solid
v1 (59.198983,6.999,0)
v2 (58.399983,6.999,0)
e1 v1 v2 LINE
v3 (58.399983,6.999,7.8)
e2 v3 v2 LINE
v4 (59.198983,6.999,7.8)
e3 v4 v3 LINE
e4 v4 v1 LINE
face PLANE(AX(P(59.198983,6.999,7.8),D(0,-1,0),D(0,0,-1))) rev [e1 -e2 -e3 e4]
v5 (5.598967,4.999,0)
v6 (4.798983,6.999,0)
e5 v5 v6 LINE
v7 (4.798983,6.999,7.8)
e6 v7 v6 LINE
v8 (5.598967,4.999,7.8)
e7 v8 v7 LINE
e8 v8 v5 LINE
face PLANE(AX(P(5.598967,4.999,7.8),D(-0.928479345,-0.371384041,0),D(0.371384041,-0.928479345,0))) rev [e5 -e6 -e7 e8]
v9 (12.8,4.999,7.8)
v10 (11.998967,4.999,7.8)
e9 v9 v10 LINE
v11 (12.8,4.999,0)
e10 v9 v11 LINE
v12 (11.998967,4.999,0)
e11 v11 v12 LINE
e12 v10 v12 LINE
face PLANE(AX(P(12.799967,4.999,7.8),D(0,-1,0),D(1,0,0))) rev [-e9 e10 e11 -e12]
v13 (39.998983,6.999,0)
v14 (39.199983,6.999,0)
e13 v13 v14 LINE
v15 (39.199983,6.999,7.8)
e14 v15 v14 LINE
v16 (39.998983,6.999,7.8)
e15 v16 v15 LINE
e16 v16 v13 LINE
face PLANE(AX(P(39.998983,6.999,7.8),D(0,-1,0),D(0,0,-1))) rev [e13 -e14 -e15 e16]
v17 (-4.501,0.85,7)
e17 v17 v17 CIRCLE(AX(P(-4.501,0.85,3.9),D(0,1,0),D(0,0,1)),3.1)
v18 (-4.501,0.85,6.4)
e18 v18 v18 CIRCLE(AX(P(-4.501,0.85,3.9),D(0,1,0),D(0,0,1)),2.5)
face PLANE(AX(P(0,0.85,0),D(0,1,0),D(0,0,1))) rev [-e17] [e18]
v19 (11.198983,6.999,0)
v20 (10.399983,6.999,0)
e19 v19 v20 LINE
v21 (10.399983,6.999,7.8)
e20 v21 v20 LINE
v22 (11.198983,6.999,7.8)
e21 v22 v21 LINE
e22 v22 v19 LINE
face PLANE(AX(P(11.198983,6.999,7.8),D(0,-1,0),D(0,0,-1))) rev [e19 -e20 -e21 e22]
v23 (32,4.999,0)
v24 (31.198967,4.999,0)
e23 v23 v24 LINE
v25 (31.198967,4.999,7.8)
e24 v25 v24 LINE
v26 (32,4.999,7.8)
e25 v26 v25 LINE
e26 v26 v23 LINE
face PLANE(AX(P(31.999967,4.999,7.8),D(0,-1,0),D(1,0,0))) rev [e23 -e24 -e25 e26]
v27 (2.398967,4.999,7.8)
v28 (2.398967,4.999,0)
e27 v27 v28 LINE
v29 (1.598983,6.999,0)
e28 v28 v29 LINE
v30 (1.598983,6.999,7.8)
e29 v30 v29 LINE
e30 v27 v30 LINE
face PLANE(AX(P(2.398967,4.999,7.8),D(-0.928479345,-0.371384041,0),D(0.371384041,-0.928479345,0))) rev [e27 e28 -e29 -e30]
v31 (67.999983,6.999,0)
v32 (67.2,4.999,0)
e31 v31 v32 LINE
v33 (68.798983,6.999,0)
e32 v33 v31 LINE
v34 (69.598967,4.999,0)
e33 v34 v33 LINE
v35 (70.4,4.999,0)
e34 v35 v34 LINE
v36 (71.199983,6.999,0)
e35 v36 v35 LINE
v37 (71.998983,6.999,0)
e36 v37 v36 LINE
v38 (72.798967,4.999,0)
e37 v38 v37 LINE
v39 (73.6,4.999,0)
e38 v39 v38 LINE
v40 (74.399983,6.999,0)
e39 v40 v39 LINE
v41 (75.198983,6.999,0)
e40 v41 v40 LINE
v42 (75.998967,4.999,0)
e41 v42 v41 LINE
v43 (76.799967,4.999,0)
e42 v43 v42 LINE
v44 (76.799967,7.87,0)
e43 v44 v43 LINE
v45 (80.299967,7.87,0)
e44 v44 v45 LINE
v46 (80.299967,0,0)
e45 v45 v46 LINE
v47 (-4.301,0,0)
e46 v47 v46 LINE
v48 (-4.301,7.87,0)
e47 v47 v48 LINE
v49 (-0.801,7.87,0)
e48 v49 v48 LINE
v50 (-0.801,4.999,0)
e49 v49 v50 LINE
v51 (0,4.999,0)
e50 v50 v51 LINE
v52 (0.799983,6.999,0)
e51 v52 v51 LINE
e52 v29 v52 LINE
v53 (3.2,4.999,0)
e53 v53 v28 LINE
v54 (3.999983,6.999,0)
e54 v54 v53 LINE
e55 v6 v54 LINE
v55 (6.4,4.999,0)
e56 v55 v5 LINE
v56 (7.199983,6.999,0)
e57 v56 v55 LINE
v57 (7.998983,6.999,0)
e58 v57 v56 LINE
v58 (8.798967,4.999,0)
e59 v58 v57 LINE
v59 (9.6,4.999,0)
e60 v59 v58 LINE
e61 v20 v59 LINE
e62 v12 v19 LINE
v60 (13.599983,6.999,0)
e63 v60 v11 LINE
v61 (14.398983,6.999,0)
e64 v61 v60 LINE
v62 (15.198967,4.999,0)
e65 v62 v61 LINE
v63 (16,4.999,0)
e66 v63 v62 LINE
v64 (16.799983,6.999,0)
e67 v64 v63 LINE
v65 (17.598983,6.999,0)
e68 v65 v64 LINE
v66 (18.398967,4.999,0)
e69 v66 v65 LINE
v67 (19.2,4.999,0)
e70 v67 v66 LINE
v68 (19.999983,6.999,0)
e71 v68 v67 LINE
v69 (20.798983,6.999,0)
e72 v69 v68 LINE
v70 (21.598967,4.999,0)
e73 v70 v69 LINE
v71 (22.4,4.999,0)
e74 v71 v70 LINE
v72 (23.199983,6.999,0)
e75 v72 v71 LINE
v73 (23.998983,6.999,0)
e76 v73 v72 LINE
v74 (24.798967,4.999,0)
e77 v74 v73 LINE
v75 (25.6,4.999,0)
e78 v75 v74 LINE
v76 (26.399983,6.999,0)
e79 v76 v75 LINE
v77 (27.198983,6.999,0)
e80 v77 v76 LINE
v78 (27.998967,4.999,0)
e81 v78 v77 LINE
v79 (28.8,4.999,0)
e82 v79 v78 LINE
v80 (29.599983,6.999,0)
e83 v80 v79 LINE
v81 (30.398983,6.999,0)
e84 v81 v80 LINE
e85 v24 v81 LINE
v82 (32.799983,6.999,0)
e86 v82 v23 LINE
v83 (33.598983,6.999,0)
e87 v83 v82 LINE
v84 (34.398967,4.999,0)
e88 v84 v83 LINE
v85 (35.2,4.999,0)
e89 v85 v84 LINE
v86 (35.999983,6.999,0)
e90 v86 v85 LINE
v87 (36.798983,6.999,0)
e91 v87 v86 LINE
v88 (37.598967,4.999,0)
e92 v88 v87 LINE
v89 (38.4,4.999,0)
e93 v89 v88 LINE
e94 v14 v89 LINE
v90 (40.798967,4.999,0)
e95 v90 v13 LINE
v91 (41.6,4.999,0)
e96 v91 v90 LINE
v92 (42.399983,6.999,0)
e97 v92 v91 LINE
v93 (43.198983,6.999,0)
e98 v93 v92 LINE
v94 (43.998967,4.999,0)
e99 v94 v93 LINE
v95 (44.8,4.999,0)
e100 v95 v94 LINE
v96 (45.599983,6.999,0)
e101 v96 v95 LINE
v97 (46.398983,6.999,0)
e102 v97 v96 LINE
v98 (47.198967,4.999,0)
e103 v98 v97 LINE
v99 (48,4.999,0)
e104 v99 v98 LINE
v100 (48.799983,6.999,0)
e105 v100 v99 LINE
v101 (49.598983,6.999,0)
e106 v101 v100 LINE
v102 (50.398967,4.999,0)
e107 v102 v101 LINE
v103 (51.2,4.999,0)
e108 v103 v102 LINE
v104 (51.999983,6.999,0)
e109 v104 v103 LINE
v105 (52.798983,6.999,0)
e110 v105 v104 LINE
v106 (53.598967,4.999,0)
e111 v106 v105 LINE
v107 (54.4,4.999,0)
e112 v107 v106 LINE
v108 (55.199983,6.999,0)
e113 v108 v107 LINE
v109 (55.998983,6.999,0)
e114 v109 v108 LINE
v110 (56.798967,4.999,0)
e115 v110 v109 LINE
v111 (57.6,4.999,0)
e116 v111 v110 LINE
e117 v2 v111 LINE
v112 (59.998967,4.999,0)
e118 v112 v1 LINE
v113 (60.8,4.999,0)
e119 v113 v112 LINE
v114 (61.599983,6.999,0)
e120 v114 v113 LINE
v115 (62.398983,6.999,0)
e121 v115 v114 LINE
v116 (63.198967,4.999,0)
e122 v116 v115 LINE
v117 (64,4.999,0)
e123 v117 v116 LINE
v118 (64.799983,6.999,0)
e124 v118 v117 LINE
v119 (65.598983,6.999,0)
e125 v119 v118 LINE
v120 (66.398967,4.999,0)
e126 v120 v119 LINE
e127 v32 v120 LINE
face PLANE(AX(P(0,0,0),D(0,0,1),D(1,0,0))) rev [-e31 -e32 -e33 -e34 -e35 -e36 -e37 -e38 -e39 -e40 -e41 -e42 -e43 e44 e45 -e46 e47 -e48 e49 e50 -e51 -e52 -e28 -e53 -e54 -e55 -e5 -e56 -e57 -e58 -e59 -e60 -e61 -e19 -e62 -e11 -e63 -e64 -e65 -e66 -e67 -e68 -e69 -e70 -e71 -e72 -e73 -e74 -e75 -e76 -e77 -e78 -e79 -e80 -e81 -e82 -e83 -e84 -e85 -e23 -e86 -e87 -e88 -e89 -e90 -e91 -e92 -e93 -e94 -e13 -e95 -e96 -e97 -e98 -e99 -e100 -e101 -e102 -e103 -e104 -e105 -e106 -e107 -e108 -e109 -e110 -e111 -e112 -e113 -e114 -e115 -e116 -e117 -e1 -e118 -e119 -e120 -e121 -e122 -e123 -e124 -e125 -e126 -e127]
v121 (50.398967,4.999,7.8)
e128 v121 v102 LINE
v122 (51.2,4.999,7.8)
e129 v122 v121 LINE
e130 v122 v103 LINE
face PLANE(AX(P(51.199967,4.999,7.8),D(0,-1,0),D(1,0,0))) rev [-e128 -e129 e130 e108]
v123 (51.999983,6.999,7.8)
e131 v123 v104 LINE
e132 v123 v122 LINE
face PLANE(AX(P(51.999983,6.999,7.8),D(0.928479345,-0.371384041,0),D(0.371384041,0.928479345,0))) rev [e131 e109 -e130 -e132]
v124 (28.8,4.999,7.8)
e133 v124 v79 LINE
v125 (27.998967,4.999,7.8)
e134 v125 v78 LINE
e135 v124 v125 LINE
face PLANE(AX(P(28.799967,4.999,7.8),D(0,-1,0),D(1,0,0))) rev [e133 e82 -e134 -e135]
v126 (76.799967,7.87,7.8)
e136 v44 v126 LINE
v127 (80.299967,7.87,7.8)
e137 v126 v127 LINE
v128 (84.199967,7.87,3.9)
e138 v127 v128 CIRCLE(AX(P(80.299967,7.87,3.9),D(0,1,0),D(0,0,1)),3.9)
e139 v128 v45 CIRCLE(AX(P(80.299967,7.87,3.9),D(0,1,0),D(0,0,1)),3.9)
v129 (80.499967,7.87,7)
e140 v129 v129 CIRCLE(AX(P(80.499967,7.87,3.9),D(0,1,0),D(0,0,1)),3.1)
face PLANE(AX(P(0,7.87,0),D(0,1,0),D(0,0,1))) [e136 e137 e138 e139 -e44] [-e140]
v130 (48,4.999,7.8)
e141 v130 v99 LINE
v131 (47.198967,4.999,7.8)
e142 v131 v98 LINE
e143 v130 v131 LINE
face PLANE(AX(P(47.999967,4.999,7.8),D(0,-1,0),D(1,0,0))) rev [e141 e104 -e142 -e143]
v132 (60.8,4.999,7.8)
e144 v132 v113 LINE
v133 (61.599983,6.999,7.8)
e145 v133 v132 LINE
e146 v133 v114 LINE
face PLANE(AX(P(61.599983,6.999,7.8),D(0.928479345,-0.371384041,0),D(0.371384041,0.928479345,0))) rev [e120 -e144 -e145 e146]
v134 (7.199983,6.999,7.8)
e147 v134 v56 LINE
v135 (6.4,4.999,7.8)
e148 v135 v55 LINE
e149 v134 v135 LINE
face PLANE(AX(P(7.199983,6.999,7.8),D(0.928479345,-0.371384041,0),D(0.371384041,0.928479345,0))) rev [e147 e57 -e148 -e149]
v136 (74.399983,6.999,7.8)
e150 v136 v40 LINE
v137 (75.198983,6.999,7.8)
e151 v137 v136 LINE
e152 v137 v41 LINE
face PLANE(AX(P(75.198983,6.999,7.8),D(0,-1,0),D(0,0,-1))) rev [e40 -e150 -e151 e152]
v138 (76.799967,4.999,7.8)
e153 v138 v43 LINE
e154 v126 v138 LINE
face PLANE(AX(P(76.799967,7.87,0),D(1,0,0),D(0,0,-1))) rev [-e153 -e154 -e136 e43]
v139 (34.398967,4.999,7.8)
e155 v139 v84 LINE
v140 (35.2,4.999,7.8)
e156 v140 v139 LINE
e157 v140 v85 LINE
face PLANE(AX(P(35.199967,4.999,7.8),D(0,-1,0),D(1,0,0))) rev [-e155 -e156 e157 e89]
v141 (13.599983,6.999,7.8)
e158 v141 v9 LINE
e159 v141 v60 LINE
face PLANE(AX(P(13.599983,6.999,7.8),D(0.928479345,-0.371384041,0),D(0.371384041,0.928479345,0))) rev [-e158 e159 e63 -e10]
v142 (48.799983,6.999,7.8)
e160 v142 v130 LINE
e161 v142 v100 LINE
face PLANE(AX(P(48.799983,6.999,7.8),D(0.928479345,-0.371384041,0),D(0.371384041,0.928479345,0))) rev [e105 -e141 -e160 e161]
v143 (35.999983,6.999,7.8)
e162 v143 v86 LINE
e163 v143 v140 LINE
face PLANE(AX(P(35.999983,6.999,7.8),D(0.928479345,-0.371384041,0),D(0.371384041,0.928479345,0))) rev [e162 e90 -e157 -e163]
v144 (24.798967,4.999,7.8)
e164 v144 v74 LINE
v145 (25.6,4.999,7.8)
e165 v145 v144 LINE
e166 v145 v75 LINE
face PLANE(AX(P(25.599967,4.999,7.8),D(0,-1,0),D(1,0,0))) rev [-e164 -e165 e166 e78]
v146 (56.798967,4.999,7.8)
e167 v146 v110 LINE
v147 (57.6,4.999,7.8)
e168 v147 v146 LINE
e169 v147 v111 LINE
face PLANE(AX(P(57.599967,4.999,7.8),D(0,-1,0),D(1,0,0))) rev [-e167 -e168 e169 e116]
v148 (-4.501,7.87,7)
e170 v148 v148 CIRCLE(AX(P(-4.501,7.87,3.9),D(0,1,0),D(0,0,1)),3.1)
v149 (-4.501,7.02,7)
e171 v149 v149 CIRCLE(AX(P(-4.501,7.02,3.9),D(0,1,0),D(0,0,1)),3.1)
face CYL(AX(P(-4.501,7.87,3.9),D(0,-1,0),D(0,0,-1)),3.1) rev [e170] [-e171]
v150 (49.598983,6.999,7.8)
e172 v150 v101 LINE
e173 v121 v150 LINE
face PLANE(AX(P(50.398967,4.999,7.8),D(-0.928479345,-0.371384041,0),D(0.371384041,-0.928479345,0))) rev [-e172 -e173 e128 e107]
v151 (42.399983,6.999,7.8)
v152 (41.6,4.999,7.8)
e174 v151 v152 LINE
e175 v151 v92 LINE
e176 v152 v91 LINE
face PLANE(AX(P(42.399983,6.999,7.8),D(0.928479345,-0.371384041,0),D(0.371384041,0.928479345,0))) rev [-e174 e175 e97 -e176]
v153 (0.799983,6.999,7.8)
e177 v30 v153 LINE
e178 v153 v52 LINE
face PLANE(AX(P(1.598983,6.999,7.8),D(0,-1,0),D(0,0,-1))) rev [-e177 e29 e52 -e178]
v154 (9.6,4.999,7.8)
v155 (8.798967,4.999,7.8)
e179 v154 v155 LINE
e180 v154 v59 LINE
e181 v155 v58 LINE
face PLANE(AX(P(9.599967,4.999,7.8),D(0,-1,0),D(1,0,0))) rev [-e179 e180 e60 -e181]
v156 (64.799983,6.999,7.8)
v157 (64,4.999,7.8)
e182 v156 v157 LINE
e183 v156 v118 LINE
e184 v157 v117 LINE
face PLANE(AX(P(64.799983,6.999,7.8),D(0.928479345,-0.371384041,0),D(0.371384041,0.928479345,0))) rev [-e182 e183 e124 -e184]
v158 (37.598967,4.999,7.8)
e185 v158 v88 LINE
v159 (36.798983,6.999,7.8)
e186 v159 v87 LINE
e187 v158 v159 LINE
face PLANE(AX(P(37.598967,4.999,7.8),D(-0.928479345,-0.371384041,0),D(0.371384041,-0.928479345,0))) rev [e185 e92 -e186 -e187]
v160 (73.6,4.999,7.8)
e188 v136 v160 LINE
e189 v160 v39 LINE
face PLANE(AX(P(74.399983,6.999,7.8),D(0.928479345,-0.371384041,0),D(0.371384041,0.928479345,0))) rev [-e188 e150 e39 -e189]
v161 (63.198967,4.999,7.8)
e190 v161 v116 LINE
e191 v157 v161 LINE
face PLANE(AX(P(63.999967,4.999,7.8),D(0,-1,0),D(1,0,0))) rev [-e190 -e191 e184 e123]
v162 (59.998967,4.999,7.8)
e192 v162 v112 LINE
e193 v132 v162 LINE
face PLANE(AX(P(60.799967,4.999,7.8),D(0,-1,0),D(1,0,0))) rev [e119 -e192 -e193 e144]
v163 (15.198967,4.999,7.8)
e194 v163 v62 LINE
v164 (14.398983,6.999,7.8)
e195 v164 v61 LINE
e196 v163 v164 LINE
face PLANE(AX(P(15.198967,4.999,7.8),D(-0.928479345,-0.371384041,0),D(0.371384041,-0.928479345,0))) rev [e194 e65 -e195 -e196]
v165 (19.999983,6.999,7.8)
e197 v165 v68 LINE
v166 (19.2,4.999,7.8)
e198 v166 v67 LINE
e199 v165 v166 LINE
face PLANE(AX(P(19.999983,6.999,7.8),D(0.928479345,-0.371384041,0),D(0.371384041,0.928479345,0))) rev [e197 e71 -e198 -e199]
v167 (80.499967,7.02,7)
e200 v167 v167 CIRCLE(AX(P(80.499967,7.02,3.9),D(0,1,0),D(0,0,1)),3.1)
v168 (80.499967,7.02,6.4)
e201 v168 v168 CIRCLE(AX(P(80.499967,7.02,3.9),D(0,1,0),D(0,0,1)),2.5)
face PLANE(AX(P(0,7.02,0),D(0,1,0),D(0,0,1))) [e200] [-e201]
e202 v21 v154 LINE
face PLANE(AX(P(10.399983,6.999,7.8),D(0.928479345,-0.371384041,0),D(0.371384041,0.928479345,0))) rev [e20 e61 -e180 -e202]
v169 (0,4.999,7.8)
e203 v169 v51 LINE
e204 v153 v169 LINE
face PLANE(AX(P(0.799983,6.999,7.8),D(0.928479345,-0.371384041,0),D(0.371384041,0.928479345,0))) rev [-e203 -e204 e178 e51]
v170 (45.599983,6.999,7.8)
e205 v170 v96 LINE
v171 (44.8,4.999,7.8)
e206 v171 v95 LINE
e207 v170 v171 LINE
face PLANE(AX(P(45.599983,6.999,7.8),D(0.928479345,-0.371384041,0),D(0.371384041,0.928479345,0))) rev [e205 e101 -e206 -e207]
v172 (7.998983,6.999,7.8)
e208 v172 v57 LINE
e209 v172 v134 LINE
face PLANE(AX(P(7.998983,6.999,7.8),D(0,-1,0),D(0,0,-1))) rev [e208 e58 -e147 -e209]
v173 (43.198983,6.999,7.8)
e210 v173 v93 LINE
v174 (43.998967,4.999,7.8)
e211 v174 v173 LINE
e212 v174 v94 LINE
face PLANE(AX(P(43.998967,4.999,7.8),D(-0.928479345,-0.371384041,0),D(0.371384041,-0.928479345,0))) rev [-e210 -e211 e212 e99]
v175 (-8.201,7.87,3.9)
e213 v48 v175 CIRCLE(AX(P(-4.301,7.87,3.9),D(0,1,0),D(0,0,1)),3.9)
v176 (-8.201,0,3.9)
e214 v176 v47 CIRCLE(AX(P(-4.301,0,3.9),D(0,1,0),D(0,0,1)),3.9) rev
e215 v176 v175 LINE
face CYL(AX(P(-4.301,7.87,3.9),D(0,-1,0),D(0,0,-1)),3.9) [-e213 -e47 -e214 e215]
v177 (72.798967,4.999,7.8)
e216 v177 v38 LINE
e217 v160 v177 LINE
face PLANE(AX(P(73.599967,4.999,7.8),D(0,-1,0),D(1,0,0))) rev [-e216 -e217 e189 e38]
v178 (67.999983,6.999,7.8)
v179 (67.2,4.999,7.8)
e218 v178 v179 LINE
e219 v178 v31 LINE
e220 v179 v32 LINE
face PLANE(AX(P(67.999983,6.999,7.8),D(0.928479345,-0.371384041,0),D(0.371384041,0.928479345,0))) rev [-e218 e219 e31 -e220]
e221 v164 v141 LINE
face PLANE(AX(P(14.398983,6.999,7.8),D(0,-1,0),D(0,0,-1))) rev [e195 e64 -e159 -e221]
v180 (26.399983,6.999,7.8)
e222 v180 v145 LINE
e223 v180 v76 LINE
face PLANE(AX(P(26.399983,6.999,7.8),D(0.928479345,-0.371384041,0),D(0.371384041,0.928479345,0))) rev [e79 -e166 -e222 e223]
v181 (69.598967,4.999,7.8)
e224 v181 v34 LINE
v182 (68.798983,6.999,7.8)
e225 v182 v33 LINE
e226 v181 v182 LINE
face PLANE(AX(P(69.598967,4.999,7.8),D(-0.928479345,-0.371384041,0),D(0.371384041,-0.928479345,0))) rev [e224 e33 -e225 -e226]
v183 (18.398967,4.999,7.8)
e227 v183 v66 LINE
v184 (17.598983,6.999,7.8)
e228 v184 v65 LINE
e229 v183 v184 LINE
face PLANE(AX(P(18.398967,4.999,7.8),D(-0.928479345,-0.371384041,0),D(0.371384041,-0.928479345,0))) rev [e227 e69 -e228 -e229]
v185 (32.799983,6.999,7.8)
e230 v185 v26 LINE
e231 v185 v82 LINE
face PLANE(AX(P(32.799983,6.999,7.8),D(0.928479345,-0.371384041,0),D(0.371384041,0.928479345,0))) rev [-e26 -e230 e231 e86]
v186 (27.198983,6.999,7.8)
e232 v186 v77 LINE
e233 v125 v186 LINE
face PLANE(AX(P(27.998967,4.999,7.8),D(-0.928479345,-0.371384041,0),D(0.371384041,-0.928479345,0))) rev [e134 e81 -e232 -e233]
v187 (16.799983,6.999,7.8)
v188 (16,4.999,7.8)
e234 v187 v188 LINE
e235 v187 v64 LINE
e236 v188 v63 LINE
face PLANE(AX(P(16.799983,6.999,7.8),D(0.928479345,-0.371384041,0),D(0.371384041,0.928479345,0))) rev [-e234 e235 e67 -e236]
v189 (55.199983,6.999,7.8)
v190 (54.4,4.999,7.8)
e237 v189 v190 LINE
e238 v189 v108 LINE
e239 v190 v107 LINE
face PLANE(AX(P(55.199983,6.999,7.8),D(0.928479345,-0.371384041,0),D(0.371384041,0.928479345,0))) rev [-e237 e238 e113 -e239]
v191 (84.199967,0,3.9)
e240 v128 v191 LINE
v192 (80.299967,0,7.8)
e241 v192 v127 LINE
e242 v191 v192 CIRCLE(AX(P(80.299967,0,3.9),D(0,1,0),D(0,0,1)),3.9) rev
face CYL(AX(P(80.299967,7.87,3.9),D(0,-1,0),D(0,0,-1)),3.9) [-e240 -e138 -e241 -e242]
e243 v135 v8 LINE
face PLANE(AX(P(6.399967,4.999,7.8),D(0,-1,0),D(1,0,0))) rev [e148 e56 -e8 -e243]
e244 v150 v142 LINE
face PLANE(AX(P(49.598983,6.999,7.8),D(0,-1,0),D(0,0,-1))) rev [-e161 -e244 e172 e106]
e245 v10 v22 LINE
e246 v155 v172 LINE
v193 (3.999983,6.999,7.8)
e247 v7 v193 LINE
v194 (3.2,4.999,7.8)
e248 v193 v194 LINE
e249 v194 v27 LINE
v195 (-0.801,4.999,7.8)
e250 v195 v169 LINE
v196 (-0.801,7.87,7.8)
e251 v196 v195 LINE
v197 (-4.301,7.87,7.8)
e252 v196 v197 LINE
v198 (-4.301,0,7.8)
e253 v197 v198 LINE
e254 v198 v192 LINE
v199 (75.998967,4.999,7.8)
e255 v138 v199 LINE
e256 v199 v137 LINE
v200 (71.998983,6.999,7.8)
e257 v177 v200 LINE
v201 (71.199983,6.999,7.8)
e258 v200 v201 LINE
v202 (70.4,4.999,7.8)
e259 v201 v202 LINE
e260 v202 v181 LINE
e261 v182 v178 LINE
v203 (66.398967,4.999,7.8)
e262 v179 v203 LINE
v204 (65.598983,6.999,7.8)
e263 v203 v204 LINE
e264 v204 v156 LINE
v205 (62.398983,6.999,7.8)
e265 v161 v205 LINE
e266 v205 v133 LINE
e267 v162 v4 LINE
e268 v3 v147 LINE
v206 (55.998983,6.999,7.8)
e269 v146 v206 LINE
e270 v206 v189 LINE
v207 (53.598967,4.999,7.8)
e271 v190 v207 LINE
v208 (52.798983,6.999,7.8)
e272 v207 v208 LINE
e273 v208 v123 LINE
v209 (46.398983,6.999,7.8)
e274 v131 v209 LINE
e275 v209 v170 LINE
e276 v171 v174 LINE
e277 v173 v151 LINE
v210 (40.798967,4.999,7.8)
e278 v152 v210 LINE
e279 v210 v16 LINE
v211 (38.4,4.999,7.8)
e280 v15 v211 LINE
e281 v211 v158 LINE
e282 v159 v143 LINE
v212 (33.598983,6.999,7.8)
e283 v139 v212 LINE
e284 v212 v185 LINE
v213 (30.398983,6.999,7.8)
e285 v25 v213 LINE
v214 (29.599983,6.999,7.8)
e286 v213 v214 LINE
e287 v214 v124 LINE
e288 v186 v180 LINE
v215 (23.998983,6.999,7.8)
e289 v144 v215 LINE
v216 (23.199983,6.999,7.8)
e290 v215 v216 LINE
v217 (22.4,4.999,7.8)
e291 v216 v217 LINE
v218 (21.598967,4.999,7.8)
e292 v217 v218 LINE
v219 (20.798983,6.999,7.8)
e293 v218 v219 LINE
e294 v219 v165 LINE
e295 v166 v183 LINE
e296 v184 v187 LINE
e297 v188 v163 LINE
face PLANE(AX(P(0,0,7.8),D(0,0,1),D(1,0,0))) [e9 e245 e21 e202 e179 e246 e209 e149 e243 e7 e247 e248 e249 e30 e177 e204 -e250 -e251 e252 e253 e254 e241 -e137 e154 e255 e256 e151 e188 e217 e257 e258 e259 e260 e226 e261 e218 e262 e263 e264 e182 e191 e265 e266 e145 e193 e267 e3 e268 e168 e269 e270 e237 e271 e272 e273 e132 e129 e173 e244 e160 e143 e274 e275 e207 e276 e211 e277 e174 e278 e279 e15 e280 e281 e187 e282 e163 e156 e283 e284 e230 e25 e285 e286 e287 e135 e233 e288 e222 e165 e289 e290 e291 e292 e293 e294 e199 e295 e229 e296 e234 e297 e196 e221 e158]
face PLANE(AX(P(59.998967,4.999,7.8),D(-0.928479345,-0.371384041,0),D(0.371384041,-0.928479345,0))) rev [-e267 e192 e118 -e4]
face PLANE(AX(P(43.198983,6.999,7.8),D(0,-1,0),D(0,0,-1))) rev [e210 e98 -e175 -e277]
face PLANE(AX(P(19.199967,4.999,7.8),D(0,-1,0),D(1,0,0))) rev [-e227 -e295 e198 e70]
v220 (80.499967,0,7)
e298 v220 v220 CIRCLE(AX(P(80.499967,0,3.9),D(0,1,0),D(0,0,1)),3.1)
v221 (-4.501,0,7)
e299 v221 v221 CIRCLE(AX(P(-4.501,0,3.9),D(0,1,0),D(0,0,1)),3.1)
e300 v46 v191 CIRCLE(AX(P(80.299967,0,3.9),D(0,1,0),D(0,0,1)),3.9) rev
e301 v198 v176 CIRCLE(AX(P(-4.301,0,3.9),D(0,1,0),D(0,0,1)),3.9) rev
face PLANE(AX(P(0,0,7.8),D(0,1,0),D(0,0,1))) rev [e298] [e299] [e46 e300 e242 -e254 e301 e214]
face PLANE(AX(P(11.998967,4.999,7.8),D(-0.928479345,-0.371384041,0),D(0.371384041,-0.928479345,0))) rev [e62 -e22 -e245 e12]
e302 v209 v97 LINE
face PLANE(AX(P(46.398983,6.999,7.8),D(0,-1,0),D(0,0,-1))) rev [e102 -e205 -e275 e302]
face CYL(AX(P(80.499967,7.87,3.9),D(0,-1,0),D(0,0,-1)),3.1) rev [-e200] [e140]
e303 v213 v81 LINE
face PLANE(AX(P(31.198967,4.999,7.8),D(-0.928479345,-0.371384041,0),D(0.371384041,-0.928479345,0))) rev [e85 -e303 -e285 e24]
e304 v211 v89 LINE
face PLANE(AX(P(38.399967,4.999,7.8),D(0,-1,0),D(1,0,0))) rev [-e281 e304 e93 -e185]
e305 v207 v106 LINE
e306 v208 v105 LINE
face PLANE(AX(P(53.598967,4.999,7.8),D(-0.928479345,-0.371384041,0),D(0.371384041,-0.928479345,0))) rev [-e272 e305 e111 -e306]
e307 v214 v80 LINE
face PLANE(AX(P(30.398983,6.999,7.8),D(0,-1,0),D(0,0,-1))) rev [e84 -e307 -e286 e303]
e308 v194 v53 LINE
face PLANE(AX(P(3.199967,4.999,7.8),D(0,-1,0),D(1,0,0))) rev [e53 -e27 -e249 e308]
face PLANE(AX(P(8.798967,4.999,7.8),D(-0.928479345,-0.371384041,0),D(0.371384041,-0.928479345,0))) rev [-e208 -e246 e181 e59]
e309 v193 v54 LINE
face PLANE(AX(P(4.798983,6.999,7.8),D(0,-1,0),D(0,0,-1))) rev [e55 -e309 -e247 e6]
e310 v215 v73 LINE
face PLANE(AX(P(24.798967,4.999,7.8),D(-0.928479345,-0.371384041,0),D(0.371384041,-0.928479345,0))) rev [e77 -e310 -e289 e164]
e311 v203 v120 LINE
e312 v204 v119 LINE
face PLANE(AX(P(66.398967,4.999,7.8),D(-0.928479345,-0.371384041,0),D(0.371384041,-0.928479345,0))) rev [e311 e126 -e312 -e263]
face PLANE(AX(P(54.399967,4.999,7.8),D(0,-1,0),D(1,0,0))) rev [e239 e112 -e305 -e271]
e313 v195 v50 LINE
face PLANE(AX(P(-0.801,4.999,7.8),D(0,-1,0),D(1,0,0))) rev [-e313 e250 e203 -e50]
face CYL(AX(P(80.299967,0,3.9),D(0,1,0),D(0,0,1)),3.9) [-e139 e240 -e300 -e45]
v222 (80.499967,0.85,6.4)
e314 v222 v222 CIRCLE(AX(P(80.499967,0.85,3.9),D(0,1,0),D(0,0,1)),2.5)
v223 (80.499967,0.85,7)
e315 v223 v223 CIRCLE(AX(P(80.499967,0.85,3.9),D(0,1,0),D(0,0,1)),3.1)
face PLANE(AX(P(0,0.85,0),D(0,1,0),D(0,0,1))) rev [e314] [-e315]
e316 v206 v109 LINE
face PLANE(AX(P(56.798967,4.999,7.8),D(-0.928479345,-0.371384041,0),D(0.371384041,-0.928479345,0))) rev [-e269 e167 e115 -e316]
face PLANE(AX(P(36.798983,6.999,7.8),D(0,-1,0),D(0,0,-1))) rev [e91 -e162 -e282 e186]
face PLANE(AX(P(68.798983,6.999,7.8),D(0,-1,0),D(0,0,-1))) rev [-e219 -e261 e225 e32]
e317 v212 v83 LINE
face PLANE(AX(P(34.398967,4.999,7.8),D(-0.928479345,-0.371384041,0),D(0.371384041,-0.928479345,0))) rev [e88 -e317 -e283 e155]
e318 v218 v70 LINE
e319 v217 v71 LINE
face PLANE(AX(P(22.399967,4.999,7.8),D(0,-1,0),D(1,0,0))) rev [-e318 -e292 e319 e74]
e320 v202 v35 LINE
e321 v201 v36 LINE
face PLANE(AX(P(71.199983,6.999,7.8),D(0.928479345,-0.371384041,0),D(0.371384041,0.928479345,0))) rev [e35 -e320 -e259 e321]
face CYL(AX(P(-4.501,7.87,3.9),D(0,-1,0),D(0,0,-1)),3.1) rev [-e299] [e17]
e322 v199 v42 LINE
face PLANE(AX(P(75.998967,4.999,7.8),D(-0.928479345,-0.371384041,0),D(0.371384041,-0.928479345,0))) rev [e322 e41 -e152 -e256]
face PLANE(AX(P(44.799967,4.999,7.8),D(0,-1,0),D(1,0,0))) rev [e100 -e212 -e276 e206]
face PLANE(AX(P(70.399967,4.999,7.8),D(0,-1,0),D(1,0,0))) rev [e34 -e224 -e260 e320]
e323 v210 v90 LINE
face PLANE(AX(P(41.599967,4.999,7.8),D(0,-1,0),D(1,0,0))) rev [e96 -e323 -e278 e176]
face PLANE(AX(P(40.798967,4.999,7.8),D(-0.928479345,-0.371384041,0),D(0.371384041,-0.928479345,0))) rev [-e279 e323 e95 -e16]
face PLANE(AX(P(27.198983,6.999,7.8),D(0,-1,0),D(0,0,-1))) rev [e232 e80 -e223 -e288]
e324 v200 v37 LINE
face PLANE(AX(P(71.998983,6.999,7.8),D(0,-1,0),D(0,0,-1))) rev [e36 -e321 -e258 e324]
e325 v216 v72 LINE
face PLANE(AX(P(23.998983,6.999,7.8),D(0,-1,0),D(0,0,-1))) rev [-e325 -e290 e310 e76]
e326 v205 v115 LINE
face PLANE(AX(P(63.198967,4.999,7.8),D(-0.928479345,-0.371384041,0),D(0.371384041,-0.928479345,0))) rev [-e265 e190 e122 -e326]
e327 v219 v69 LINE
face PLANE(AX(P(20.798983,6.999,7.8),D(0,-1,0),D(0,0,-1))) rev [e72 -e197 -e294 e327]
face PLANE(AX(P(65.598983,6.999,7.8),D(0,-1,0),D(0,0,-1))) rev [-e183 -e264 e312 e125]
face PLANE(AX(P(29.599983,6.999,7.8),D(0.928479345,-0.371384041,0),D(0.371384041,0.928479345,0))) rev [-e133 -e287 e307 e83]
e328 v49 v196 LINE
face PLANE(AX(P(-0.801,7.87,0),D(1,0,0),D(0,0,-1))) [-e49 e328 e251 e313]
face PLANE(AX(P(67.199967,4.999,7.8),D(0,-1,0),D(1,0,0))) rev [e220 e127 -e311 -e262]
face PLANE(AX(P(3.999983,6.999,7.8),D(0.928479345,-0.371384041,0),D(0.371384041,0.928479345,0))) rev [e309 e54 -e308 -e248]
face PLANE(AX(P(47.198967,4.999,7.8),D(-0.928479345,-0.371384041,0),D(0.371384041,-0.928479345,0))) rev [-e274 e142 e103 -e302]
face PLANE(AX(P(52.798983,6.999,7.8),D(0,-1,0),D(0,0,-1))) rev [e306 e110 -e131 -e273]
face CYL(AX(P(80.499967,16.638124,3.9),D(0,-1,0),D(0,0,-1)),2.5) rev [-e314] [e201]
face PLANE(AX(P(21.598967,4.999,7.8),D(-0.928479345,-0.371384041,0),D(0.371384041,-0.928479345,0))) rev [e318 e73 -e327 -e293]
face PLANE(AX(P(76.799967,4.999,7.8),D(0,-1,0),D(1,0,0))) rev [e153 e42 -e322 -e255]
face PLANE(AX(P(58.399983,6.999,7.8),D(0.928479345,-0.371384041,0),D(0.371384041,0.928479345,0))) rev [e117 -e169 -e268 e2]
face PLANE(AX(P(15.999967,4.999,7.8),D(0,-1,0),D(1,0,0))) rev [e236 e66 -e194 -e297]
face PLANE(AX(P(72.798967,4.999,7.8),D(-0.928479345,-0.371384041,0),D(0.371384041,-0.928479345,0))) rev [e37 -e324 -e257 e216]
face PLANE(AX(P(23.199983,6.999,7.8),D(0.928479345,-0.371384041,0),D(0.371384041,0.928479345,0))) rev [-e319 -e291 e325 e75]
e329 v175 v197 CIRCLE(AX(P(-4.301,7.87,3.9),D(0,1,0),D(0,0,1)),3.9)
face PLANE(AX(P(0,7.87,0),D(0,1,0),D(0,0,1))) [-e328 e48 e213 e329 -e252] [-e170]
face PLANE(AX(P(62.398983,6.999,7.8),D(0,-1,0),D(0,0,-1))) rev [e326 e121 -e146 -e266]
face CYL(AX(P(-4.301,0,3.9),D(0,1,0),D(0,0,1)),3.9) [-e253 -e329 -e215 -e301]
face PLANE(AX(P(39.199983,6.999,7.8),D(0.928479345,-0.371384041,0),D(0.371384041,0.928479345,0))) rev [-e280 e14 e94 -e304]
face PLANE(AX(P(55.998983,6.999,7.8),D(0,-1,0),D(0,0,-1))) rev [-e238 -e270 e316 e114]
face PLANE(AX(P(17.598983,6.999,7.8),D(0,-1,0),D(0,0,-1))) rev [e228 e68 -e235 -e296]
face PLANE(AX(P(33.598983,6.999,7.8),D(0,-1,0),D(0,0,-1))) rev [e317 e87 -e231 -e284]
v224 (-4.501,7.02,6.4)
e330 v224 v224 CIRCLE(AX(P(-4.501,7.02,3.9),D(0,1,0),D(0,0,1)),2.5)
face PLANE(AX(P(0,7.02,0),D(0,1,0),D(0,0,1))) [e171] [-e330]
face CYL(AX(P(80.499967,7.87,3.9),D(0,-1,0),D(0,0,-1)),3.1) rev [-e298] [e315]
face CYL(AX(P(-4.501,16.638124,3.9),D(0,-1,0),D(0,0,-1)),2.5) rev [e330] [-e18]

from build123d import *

# Parameters (mm, degrees)
SALIENTE_EXTRUIR1_DEPTH = 7.8
MATRIZL1_DEPTH          = 7.8
CROQUIS2_W              = 7.8
CROQUIS2_H              = 4.999
SALIENTE_EXTRUIR2_DEPTH = 0.801
CROQUIS4_W              = 7.4
CROQUIS4_H              = 7.8
CROQUIS4_R              = 3.1
SALIENTE_EXTRUIR3_DEPTH = 7.87
SALIENTE_EXTRUIR4_START = 0.85
CROQUIS4_3_R            = 3.1
CROQUIS4_3_R_2          = 2.5
SALIENTE_EXTRUIR4_DEPTH = 6.17
REDONDEO2_R             = 3.9


with BuildPart() as part:
    # Croquis1 → Saliente-Extruir1 (new body)
    with BuildSketch(Plane.XY):
        Polygon((0, 0), (3.199966839, 0), (3.199966839, 4.999), (2.398966839, 4.999), (1.598983419, 6.999), (0.799983419, 6.999), (0, 4.999), align=None)
    extrude(amount=SALIENTE_EXTRUIR1_DEPTH)

    # MatrizL1: read off the stored shape, not the designer's step
    # MatrizL1 outline → MatrizL1 (add)
    with BuildSketch(Plane.XY):
        Polygon((0.799983419, 6.999), (0, 4.999), (0, 0), (76.799966839, 0), (76.799966839, 4.999), (75.998966839, 4.999), (75.198983419, 6.999), (74.399983419, 6.999), (73.6, 4.999), (72.798966839, 4.999), (71.998983419, 6.999), (71.199983419, 6.999), (70.4, 4.999), (69.598966839, 4.999), (68.798983419, 6.999), (67.999983419, 6.999), (67.2, 4.999), (66.398966839, 4.999), (65.598983419, 6.999), (64.799983419, 6.999), (64, 4.999), (63.198966839, 4.999), (62.398983419, 6.999), (61.599983419, 6.999), (60.8, 4.999), (59.998966839, 4.999), (59.198983419, 6.999), (58.399983419, 6.999), (57.6, 4.999), (56.798966839, 4.999), (55.998983419, 6.999), (55.199983419, 6.999), (54.4, 4.999), (53.598966839, 4.999), (52.798983419, 6.999), (51.999983419, 6.999), (51.2, 4.999), (50.398966839, 4.999), (49.598983419, 6.999), (48.799983419, 6.999), (48, 4.999), (47.198966839, 4.999), (46.398983419, 6.999), (45.599983419, 6.999), (44.8, 4.999), (43.998966839, 4.999), (43.198983419, 6.999), (42.399983419, 6.999), (41.6, 4.999), (40.798966839, 4.999), (39.998983419, 6.999), (39.199983419, 6.999), (38.4, 4.999), (37.598966839, 4.999), (36.798983419, 6.999), (35.999983419, 6.999), (35.2, 4.999), (34.398966839, 4.999), (33.598983419, 6.999), (32.799983419, 6.999), (32, 4.999), (31.198966839, 4.999), (30.398983419, 6.999), (29.599983419, 6.999), (28.8, 4.999), (27.998966839, 4.999), (27.198983419, 6.999), (26.399983419, 6.999), (25.6, 4.999), (24.798966839, 4.999), (23.998983419, 6.999), (23.199983419, 6.999), (22.4, 4.999), (21.598966839, 4.999), (20.798983419, 6.999), (19.999983419, 6.999), (19.2, 4.999), (18.398966839, 4.999), (17.598983419, 6.999), (16.799983419, 6.999), (16, 4.999), (15.198966839, 4.999), (14.398983419, 6.999), (13.599983419, 6.999), (12.8, 4.999), (11.998966839, 4.999), (11.198983419, 6.999), (10.399983419, 6.999), (9.6, 4.999), (8.798966839, 4.999), (7.998983419, 6.999), (7.199983419, 6.999), (6.4, 4.999), (5.598966839, 4.999), (4.798983419, 6.999), (3.999983419, 6.999), (3.2, 4.999), (2.398966839, 4.999), (1.598983419, 6.999), align=None)
    extrude(amount=MATRIZL1_DEPTH)

    # Croquis2 → Saliente-Extruir2 (add)
    with BuildSketch(Plane.ZY):
        with Locations((3.9, 2.4995)):
            Rectangle(CROQUIS2_W, CROQUIS2_H)
    extrude(amount=SALIENTE_EXTRUIR2_DEPTH)

    # Croquis4 → Saliente-Extruir3 (add)
    # profile 1 of 2: a face of its own
    with BuildSketch(Plane(origin=(0, 0, 0), x_dir=(1, 0, 0), z_dir=(0, 1, 0))):
        with Locations((-4.501, -3.9)):
            Rectangle(CROQUIS4_W, CROQUIS4_H)
        with Locations(Location((-4.501, -3.9, 0), (0, 0, 270))):
            Circle(CROQUIS4_R, mode=Mode.SUBTRACT)
    # profile 2 of 2: a face of its own
    with BuildSketch(Plane(origin=(0, 0, 0), x_dir=(1, 0, 0), z_dir=(0, 1, 0))):
        with Locations((80.499966839, -3.9)):
            Rectangle(CROQUIS4_W, CROQUIS4_H)
        with Locations(Location((80.499966839, -3.9, 0), (0, 0, 270))):
            Circle(CROQUIS4_R, mode=Mode.SUBTRACT)
    extrude(amount=SALIENTE_EXTRUIR3_DEPTH)

    # Croquis4<3> → Saliente-Extruir4 (add)
    # profile 1 of 2: a face of its own
    with BuildSketch(Plane(origin=(0, 0, 0), x_dir=(1, 0, 0), z_dir=(0, 1, 0)).offset(SALIENTE_EXTRUIR4_START)):
        with Locations(Location((-4.501, -3.9, 0), (0, 0, 270))):
            Circle(CROQUIS4_3_R)
        with Locations(Location((-4.501, -3.9, 0), (0, 0, 270))):
            Circle(CROQUIS4_3_R_2, mode=Mode.SUBTRACT)
    # profile 2 of 2: a face of its own
    with BuildSketch(Plane(origin=(0, 0, 0), x_dir=(1, 0, 0), z_dir=(0, 1, 0)).offset(SALIENTE_EXTRUIR4_START)):
        with Locations(Location((80.499966839, -3.9, 0), (0, 0, 270))):
            Circle(CROQUIS4_3_R)
        with Locations(Location((80.499966839, -3.9, 0), (0, 0, 270))):
            Circle(CROQUIS4_3_R_2, mode=Mode.SUBTRACT)
    extrude(amount=SALIENTE_EXTRUIR4_DEPTH)

    # Redondeo2
    redondeo2_edges = [part.edges().sort_by_distance(p)[0] for p in [
        (84.199966839, 3.935, 0),
        (84.199966839, 3.935, 7.8),
        (-8.201, 3.935, 0),
        (-8.201, 3.935, 7.8),
    ]]
    fillet(redondeo2_edges, radius=REDONDEO2_R - 0.0001)  # a hair under: the kernel refuses the full size


solid = part.part
